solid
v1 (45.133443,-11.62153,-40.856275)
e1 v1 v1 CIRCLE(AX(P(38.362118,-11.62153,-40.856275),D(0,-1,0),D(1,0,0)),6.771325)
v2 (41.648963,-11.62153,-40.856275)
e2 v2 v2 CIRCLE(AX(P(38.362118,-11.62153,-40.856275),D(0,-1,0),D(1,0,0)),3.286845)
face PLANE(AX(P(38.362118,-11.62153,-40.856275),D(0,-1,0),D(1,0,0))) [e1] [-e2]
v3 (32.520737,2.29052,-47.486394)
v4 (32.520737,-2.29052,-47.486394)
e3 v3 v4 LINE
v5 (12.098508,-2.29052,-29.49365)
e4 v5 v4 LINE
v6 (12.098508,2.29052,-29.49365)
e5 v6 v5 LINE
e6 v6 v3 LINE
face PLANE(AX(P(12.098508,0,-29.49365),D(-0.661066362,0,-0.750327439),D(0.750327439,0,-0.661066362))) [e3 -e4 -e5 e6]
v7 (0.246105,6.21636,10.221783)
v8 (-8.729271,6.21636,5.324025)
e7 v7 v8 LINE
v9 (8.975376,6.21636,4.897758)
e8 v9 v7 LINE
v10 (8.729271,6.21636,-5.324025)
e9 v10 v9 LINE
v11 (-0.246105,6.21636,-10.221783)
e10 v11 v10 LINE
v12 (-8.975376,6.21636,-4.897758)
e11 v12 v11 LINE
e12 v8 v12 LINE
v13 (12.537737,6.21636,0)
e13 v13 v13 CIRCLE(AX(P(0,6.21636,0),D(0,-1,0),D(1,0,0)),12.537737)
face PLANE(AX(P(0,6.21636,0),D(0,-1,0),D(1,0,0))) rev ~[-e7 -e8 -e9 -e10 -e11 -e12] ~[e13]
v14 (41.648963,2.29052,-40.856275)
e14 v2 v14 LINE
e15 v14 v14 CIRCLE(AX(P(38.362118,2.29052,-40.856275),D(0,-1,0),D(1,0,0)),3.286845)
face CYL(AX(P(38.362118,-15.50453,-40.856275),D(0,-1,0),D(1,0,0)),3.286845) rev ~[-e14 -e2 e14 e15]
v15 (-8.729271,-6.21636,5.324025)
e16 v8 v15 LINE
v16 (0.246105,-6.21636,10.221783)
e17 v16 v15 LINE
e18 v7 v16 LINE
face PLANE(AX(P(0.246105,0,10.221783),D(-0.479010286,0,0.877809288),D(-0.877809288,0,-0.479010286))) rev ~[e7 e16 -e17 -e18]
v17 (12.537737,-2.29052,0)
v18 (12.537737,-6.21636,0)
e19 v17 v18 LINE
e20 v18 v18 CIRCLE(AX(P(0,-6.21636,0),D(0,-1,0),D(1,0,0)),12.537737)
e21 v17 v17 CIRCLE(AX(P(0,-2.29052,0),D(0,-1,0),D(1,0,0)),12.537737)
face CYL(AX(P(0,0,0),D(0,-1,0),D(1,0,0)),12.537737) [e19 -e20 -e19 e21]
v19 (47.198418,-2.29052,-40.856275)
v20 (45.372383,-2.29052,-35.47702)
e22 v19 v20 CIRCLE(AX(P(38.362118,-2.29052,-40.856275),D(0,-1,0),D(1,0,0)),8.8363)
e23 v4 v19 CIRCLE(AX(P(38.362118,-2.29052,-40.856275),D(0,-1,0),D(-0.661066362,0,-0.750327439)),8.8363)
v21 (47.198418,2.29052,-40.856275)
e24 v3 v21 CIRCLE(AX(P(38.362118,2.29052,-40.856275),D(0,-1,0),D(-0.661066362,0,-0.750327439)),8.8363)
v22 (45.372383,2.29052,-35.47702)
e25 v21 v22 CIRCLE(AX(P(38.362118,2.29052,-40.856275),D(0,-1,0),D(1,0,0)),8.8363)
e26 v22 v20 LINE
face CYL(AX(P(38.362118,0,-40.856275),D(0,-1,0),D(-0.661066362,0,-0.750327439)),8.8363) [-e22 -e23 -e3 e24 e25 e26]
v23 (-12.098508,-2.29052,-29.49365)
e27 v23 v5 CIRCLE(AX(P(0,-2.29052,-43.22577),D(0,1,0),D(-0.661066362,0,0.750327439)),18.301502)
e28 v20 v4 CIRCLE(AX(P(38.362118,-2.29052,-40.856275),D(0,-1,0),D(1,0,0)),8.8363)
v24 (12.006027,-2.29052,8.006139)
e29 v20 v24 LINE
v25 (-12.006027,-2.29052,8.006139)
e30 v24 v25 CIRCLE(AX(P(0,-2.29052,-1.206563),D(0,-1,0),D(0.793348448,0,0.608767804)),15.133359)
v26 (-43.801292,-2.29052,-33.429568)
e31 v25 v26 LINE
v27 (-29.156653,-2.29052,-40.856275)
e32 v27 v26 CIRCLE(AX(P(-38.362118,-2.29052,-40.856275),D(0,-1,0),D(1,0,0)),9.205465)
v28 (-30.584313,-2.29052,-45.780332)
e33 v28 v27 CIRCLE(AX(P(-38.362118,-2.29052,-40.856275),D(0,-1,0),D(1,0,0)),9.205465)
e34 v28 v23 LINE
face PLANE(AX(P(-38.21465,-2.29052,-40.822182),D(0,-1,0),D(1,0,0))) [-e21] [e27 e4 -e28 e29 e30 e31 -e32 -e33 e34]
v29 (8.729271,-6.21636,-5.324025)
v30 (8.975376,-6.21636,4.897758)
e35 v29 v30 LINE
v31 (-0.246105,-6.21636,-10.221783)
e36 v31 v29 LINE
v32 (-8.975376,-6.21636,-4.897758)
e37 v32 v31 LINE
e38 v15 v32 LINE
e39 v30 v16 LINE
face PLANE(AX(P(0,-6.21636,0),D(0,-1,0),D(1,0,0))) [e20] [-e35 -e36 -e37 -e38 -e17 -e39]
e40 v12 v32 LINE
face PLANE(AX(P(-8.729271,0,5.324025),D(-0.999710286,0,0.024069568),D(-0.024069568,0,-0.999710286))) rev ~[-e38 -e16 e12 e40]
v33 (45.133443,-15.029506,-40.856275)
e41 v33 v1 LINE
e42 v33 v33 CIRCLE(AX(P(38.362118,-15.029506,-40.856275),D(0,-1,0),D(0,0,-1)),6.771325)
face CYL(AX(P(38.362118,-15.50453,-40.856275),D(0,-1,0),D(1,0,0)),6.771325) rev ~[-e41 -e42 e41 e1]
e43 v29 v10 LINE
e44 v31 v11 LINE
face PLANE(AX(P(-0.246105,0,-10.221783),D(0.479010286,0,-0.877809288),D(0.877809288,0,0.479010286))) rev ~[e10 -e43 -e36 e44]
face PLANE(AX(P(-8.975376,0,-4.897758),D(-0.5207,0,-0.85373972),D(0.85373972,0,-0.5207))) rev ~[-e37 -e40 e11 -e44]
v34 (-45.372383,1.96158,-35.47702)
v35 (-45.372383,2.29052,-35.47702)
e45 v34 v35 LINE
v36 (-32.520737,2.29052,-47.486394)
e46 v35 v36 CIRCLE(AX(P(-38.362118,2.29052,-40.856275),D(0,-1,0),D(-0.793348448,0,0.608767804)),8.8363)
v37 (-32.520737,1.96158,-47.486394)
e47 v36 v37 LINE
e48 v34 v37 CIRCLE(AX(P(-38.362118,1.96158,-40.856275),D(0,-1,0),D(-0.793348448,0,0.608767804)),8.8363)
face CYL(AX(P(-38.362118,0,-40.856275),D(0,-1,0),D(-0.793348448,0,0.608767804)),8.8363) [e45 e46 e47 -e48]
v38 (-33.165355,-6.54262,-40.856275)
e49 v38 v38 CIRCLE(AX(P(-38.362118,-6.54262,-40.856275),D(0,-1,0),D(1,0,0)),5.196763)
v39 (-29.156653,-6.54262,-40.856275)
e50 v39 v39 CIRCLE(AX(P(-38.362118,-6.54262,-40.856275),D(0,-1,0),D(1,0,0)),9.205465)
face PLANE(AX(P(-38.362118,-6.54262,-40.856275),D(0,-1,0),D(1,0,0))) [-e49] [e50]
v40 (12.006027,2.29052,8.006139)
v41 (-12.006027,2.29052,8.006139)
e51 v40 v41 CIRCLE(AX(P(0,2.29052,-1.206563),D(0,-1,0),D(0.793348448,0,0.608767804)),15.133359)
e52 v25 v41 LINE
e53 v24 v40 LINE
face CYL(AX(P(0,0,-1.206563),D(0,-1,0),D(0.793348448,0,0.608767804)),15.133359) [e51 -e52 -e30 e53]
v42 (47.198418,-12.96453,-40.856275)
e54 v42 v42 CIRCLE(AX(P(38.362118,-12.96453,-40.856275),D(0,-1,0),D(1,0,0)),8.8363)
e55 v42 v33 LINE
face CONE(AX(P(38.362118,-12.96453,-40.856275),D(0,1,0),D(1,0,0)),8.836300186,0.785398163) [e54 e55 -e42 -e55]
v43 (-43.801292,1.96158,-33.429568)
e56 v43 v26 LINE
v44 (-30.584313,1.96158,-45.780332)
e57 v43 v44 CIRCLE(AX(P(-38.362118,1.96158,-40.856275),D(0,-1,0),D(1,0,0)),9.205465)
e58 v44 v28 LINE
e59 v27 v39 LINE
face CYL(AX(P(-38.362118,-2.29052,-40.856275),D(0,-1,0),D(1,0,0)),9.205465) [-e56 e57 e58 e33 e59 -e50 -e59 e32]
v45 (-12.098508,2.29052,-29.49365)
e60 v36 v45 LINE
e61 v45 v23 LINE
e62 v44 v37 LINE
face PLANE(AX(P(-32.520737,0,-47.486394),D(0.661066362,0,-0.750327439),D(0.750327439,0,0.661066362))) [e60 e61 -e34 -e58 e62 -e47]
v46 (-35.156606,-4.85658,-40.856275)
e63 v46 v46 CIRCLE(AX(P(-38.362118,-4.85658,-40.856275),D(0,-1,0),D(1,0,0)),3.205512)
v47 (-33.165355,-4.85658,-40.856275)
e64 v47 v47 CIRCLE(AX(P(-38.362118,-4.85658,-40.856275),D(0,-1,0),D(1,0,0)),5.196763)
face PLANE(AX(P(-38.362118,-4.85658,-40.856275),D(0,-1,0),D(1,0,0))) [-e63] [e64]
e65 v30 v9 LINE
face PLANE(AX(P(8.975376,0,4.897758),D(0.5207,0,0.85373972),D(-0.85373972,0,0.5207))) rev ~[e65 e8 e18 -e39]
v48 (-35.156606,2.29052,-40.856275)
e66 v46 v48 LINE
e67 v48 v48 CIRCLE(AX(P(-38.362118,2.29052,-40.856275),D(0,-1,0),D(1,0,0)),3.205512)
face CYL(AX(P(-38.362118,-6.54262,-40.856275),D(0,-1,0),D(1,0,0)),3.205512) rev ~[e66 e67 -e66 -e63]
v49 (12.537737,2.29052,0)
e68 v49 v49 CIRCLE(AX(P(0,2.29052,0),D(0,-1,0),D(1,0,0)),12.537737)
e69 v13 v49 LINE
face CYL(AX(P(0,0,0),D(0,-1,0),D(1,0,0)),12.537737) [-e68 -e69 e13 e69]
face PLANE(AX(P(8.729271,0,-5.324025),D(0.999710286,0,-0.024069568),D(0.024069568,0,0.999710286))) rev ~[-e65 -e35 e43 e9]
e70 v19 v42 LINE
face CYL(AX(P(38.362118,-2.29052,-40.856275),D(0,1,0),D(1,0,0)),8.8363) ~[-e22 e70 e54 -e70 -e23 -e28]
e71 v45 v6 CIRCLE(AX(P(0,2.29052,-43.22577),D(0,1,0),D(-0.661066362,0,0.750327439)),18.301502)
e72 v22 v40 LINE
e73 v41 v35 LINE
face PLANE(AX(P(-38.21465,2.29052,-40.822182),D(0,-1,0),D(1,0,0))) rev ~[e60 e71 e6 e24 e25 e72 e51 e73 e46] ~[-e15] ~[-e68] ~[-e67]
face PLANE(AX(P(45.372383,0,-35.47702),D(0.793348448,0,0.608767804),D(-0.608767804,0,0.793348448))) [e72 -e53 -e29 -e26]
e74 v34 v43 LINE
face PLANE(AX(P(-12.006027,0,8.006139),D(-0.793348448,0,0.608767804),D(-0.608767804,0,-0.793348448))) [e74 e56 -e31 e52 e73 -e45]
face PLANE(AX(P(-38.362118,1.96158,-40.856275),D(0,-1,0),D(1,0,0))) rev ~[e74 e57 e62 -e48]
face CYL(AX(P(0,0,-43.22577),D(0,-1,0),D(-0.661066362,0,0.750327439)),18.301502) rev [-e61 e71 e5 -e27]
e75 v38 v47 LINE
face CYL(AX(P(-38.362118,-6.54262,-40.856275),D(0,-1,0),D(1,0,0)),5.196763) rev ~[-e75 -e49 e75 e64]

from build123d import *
from build123d import SkipClean  # not in build123d's __all__

# Parameters (mm, degrees)
F0_R      = 12.5377374601
F1_DEPTH  = 6.21636
F3_DEPTH  = 43.11412
F5_DEPTH  = 2.29052
F6_R      = 9.2054650922
F7_DEPTH  = 4.2521
F8_R      = 8.8363001854
F9_DEPTH  = 13.21401
F10_R     = 3.2055120306
F11_DEPTH = 28.79148
F12_R     = 5.1967625573
F13_DEPTH = 1.68604
F14_R     = 3.2868447942
F15_DEPTH = 33.07979
F16_R     = 6.7713245086
F17_DEPTH = 3.883
F20_DEPTH = 42.80702
F22_DEPTH = 12.5


# Not quite as in the source:
# - a fillet or chamfer that OpenCascade refuses, or shapes differently, is made with other operations: its cross-section is extruded or revolved along the edge and cut away or added
# - after a boolean that leaves OpenCascade's solid faulty, fix() repairs it


with BuildPart() as f1:
    # F0 (on Front) → F1 (new body, symmetric)
    with BuildSketch(Plane.XZ):
        Circle(F0_R)
    extrude(amount=F1_DEPTH, both=True)

    # F2 (on face) → F3 (cut)
    with BuildSketch(Plane.XZ.offset(6.21636)):
        Polygon((-1.5670347233, 8.3723281259), (-8.0341662075, 2.8290721839), (-6.4671314842, -5.5432559419), (1.5670347233, -8.3723281259), (8.0341662075, -2.8290721839), (6.4671314842, 5.5432559419), align=None)
    extrude(amount=-F3_DEPTH, mode=Mode.SUBTRACT)

    # F4 (on Front) → F5 (join, symmetric)
    with BuildSketch(Plane.XZ):
        with BuildLine():
            ThreePointArc((-32.5207371804, -47.4863935268), (-30.3092801317, -44.4938571079), (-29.5258178112, -40.8562750417))
            ThreePointArc((-29.5258178112, -40.8562750417), (-35.5217487699, -32.4889275753), (-45.3723830373, -35.4770199791))
            ThreePointArc((-45.3723830373, -35.4770199791), (-44.3951798921, -47.3124631688), (-32.5207371804, -47.4863935268))
        make_face()
        with BuildLine():
            ThreePointArc((-45.3723830373, -35.4770199791), (-35.5217487699, -32.4889275753), (-29.5258178112, -40.8562750417))
            ThreePointArc((-29.5258178112, -40.8562750417), (-30.3092801317, -44.4938571079), (-32.5207371804, -47.4863935268))
            Line((-32.5207371804, -47.4863935268), (-12.0985076262, -29.4936502279))
            ThreePointArc((-12.0985076262, -29.4936502279), (0, -24.9242672402), (12.0985076262, -29.4936502279))
            Line((12.0985076262, -29.4936502279), (32.5207371804, -47.4863935268))
            ThreePointArc((32.5207371804, -47.4863935268), (32.3290561012, -34.4000869145), (45.3723830373, -35.4770199791))
            Line((45.3723830373, -35.4770199791), (12.0060265403, 8.0061388902))
            ThreePointArc((12.0060265403, 8.0061388902), (0, 13.9267959918), (-12.0060265403, 8.0061388902))
            Line((-12.0060265403, 8.0061388902), (-45.3723830373, -35.4770199791))
        make_face()
        with BuildLine():
            ThreePointArc((47.1984181821, -40.8562750417), (46.729465463, -38.0159058149), (45.3723830373, -35.4770199791))
            ThreePointArc((45.3723830373, -35.4770199791), (32.3290561012, -34.4000869145), (32.5207371804, -47.4863935268))
            ThreePointArc((32.5207371804, -47.4863935268), (41.9997000629, -48.9091129066), (47.1984181821, -40.8562750417))
        make_face()
    extrude(amount=F5_DEPTH, both=True)

    # F6 (on face) → F7 (join, symmetric)
    with BuildSketch(Plane.XZ.offset(2.29052)):
        with Locations((-38.3621179966, -40.8562750417)):
            Circle(F6_R)
    extrude(amount=F7_DEPTH, both=True)

    # F8 (on face) → F9 (join)
    with BuildSketch(Plane.XZ.offset(2.29052)):
        with Locations((38.3621179966, -40.8562750417)):
            Circle(F8_R)
    with SkipClean():  # cleaning this boolean's faces spoils the solid; the shape is the same uncleaned
        extrude(amount=F9_DEPTH)

    # F10 (on face) → F11 (cut)
    with BuildSketch(Plane.XZ.offset(6.54262)):
        with Locations((-38.3621179966, -40.8562750417)):
            Circle(F10_R)
    extrude(amount=-F11_DEPTH, mode=Mode.SUBTRACT)

    add(f1.part.fix(), mode=Mode.REPLACE)

    # F12 (on face) → F13 (cut)
    with BuildSketch(Plane.XZ.offset(6.54262)):
        with Locations((-38.3621179966, -40.8562750417)):
            Circle(F12_R)
    extrude(amount=-F13_DEPTH, mode=Mode.SUBTRACT)

    # F14 (on face) → F15 (cut)
    with BuildSketch(Plane.XZ.offset(15.50453)):
        with Locations((38.3621179966, -40.8562750417)):
            Circle(F14_R)
    extrude(amount=-F15_DEPTH, mode=Mode.SUBTRACT)

    # F16 (on face) → F17 (cut)
    with BuildSketch(Plane.XZ.offset(15.50453)):
        with Locations((38.3621179966, -40.8562750417)):
            Circle(F16_R)
    extrude(amount=-F17_DEPTH, mode=Mode.SUBTRACT)

    # F18: chamfer of 2.54 on 1 edges, made by hand

    # F18_s1 → F18_t2 (revolve, cut)
    with BuildSketch(Plane.XY.offset(-40.8562750417)):
        Polygon((47.1984181821, -12.96453), (44.6584181821, -15.50453), (47.1984181821, -15.50453), align=None)
    revolve(axis=Axis((38.3621179966, -15.50453, -40.8562750417), (0, -1, 0)), mode=Mode.SUBTRACT)

    # F19 (on face) → F20 (cut)
    with BuildSketch(Plane.XZ.offset(2.29052)):
        Polygon((7.5046534745, -4.3328137037), (7.5046534745, 4.3328137037), (0, 8.6656274074), (-7.5046534745, 4.3328137037), (-7.5046534745, -4.3328137037), (0, -8.6656274074), align=None)
    extrude(amount=-F20_DEPTH, mode=Mode.SUBTRACT)

    # F21 (on Front) → F22 (cut, symmetric)
    with BuildSketch(Plane.XZ):
        Polygon((8.97537597, 4.8977579377), (0.2461051893, 10.2217825674), (-8.7292707806, 5.3240246297), (-8.97537597, -4.8977579377), (-0.2461051893, -10.2217825674), (8.7292707806, -5.3240246297), align=None)
    extrude(amount=F22_DEPTH, both=True, mode=Mode.SUBTRACT)


solid = f1.part
